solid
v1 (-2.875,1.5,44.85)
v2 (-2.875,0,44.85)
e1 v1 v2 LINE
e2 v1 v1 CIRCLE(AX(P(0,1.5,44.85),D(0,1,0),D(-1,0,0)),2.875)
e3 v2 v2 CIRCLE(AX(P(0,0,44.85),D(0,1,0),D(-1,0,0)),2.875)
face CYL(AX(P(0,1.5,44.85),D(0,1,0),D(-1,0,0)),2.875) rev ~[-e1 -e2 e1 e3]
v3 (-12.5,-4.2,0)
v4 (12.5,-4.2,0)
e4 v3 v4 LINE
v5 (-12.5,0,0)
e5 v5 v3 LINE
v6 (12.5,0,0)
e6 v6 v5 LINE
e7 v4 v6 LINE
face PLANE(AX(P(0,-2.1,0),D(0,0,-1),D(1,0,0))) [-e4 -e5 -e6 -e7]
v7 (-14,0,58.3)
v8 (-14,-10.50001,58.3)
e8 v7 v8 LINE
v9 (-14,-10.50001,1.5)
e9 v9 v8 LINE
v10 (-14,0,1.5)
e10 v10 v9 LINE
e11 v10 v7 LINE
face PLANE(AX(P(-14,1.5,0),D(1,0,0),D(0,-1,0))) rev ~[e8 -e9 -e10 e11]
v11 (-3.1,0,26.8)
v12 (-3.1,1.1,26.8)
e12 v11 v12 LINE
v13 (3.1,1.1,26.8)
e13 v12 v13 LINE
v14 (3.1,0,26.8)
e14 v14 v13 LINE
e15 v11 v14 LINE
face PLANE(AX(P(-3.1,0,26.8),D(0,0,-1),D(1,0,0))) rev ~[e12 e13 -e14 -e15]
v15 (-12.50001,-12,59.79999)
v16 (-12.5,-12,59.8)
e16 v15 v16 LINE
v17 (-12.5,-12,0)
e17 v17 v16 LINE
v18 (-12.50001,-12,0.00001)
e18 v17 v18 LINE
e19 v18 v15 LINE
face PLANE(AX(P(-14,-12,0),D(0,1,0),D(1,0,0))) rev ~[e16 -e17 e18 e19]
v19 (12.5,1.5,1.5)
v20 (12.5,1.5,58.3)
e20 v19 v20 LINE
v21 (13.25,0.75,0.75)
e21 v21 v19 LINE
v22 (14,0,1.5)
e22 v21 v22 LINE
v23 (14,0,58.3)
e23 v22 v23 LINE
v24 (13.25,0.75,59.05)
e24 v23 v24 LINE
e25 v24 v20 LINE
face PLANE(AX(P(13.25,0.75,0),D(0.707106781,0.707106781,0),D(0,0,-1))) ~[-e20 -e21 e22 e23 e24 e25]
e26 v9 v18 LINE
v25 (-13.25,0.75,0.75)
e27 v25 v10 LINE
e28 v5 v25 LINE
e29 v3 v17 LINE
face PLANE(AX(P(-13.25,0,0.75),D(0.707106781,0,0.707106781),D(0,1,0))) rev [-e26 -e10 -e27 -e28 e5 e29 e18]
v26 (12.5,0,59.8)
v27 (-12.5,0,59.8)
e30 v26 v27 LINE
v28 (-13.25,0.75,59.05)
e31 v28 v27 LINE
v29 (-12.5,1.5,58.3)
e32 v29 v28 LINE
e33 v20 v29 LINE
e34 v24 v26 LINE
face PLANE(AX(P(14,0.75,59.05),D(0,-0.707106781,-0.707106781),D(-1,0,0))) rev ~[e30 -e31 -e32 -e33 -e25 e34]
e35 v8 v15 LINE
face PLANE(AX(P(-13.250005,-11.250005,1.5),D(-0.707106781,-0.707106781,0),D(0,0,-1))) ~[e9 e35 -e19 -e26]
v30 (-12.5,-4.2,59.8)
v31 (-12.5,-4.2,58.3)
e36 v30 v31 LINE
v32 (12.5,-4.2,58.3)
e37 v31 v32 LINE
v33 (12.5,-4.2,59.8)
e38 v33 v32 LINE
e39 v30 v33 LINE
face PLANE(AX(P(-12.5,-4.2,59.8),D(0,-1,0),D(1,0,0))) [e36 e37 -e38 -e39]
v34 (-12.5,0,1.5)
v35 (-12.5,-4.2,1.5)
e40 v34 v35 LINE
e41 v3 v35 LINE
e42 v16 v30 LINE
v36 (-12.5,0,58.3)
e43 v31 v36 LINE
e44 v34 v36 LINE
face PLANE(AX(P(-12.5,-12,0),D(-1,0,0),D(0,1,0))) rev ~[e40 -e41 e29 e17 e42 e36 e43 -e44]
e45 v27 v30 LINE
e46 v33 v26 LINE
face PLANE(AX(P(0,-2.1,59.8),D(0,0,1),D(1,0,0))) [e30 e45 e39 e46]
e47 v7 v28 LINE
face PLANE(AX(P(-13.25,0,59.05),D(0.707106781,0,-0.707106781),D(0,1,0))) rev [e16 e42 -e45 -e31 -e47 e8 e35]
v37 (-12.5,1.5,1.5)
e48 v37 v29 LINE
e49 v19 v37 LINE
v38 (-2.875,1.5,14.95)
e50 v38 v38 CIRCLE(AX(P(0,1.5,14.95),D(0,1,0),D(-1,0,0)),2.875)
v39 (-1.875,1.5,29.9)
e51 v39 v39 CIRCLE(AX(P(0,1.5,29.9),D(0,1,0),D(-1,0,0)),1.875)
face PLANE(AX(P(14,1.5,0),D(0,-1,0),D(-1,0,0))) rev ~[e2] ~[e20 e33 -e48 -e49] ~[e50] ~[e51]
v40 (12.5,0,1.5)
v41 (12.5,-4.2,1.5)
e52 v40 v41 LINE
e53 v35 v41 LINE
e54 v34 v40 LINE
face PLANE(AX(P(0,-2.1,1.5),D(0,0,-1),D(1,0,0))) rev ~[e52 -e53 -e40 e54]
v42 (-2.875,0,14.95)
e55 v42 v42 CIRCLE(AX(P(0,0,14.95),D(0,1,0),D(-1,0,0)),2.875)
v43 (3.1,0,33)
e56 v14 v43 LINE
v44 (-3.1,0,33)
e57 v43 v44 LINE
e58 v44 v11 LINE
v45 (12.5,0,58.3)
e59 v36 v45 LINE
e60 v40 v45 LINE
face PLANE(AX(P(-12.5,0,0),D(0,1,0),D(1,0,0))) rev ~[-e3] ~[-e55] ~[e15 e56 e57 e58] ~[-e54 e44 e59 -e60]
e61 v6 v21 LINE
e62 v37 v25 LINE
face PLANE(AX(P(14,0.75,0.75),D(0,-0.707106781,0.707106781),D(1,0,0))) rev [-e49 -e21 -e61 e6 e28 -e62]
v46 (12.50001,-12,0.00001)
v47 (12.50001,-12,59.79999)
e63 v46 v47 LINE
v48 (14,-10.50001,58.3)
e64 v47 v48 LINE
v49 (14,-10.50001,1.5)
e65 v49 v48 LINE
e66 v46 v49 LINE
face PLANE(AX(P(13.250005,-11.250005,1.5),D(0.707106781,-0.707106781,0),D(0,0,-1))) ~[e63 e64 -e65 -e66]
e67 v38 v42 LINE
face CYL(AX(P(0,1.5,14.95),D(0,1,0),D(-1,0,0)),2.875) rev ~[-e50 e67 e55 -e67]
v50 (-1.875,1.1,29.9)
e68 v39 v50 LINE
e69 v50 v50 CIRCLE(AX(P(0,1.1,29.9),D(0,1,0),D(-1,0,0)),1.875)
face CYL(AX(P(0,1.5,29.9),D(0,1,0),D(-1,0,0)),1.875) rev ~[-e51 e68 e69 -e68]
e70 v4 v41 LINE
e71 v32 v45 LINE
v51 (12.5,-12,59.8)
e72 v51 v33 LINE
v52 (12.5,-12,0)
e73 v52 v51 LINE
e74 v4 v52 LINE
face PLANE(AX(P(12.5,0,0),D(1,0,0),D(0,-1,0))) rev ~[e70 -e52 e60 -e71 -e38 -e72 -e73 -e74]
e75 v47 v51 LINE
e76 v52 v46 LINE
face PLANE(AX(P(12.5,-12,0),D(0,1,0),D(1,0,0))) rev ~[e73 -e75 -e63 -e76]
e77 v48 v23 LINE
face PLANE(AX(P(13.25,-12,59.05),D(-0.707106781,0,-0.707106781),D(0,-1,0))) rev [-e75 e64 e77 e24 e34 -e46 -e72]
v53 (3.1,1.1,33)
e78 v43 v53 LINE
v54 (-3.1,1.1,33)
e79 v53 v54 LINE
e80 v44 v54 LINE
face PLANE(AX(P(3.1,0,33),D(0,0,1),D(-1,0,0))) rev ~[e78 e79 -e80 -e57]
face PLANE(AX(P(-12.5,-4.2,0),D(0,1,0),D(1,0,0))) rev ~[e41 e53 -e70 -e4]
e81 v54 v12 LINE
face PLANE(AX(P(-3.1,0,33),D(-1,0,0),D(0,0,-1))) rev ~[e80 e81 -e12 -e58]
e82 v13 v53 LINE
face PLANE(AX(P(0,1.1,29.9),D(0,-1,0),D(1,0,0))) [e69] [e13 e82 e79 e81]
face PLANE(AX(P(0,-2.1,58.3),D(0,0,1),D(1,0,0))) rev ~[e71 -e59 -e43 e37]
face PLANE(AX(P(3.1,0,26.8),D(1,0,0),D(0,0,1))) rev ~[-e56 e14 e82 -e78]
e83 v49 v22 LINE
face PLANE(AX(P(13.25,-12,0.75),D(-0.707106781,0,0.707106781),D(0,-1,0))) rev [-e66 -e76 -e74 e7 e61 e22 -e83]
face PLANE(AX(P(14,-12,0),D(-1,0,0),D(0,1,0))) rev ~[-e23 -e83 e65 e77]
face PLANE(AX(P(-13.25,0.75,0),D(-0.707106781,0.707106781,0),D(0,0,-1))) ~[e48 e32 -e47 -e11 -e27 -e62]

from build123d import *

# Parameters (mm, degrees)
F1_DEPTH  = 59.8
F2_R      = 2.875
F2_R_2    = 1.875
F3_DEPTH  = 25
F4_W      = 25
F4_H      = 4.2
F5_DEPTH  = 1.5
F6_W      = 25
F6_H      = 4.2
F7_DEPTH  = 1.5
F8_SIZE   = 1.5
F9_SIZE   = 1.5
F11_DEPTH = 1.1
F12_SIZE  = 1.49999


# Not quite as in the source:
# - a fillet or chamfer is up to 0.001 mm smaller than in the source, because OpenCascade refuses the exact size


with BuildPart() as f1:
    # F0 (on Top) → F1 (new body)
    with BuildSketch(Plane.XY):
        Polygon((-12.5, 0), (0, 0), (0, 1.5), (-12.5, 1.5), (-14, 1.5), (-14, 0), (-14, -12), (-12.5, -12), align=None)
        Polygon((0, 1.5), (0, 0), (12.5, 0), (12.5, -12), (14, -12), (14, 0), (14, 1.5), (12.5, 1.5), align=None)
    extrude(amount=F1_DEPTH)

    # F2 (on face) → F3 (cut)
    with BuildSketch(Plane(origin=(0, 1.5, 0), x_dir=(-1, 0, 0), z_dir=(0, 1, 0))):
        with Locations((0, 44.85)):
            Circle(F2_R)
        with Locations((0, 29.9)):
            Circle(F2_R_2)
        with Locations((0, 14.95)):
            Circle(F2_R)
    extrude(amount=-F3_DEPTH, mode=Mode.SUBTRACT)

    # F4 (on face) → F5 (join)
    with BuildSketch(Plane.XY.offset(59.8)):
        with Locations((0, -2.1)):
            Rectangle(F4_W, F4_H)
    extrude(amount=-F5_DEPTH)

    # F6 (on face) → F7 (join)
    with BuildSketch(Plane(origin=(0, 0, 0), x_dir=(1, 0, 0), z_dir=(0, 0, -1))):
        with Locations((0, 2.1)):
            Rectangle(F6_W, F6_H)
    extrude(amount=-F7_DEPTH)

    # F8
    f8_edges = [f1.edges().sort_by_distance(p)[0] for p in [
        (14, 1.5, 29.9),
        (-14, 1.5, 29.9),
        (0, 1.5, 0),
        (0, 1.5, 59.8),
    ]]
    chamfer(f8_edges, length=F8_SIZE)

    # F9
    f9_edges = [f1.edges().sort_by_distance(p)[0] for p in [
        (-14, -6, 0),
        (14, -6, 0),
        (-14, -6, 59.8),
        (14, -6, 59.8),
    ]]
    chamfer(f9_edges, length=F9_SIZE)

    # F10 (on face) → F11 (cut)
    with BuildSketch(Plane.XZ):
        Polygon((3.1, 33), (0, 33), (-3.1, 33), (-3.1, 26.8), (0, 26.8), (3.1, 26.8), (3.1, 29.9), align=None)
    extrude(amount=-F11_DEPTH, mode=Mode.SUBTRACT)

    # F12 (size 1.5 in the source; OpenCascade refuses exactly that, so slightly less here)
    f12_edges = [f1.edges().sort_by_distance(p)[0] for p in [
        (-14, -12, 29.9),
        (14, -12, 29.9),
    ]]
    chamfer(f12_edges, length=F12_SIZE)


solid = f1.part
